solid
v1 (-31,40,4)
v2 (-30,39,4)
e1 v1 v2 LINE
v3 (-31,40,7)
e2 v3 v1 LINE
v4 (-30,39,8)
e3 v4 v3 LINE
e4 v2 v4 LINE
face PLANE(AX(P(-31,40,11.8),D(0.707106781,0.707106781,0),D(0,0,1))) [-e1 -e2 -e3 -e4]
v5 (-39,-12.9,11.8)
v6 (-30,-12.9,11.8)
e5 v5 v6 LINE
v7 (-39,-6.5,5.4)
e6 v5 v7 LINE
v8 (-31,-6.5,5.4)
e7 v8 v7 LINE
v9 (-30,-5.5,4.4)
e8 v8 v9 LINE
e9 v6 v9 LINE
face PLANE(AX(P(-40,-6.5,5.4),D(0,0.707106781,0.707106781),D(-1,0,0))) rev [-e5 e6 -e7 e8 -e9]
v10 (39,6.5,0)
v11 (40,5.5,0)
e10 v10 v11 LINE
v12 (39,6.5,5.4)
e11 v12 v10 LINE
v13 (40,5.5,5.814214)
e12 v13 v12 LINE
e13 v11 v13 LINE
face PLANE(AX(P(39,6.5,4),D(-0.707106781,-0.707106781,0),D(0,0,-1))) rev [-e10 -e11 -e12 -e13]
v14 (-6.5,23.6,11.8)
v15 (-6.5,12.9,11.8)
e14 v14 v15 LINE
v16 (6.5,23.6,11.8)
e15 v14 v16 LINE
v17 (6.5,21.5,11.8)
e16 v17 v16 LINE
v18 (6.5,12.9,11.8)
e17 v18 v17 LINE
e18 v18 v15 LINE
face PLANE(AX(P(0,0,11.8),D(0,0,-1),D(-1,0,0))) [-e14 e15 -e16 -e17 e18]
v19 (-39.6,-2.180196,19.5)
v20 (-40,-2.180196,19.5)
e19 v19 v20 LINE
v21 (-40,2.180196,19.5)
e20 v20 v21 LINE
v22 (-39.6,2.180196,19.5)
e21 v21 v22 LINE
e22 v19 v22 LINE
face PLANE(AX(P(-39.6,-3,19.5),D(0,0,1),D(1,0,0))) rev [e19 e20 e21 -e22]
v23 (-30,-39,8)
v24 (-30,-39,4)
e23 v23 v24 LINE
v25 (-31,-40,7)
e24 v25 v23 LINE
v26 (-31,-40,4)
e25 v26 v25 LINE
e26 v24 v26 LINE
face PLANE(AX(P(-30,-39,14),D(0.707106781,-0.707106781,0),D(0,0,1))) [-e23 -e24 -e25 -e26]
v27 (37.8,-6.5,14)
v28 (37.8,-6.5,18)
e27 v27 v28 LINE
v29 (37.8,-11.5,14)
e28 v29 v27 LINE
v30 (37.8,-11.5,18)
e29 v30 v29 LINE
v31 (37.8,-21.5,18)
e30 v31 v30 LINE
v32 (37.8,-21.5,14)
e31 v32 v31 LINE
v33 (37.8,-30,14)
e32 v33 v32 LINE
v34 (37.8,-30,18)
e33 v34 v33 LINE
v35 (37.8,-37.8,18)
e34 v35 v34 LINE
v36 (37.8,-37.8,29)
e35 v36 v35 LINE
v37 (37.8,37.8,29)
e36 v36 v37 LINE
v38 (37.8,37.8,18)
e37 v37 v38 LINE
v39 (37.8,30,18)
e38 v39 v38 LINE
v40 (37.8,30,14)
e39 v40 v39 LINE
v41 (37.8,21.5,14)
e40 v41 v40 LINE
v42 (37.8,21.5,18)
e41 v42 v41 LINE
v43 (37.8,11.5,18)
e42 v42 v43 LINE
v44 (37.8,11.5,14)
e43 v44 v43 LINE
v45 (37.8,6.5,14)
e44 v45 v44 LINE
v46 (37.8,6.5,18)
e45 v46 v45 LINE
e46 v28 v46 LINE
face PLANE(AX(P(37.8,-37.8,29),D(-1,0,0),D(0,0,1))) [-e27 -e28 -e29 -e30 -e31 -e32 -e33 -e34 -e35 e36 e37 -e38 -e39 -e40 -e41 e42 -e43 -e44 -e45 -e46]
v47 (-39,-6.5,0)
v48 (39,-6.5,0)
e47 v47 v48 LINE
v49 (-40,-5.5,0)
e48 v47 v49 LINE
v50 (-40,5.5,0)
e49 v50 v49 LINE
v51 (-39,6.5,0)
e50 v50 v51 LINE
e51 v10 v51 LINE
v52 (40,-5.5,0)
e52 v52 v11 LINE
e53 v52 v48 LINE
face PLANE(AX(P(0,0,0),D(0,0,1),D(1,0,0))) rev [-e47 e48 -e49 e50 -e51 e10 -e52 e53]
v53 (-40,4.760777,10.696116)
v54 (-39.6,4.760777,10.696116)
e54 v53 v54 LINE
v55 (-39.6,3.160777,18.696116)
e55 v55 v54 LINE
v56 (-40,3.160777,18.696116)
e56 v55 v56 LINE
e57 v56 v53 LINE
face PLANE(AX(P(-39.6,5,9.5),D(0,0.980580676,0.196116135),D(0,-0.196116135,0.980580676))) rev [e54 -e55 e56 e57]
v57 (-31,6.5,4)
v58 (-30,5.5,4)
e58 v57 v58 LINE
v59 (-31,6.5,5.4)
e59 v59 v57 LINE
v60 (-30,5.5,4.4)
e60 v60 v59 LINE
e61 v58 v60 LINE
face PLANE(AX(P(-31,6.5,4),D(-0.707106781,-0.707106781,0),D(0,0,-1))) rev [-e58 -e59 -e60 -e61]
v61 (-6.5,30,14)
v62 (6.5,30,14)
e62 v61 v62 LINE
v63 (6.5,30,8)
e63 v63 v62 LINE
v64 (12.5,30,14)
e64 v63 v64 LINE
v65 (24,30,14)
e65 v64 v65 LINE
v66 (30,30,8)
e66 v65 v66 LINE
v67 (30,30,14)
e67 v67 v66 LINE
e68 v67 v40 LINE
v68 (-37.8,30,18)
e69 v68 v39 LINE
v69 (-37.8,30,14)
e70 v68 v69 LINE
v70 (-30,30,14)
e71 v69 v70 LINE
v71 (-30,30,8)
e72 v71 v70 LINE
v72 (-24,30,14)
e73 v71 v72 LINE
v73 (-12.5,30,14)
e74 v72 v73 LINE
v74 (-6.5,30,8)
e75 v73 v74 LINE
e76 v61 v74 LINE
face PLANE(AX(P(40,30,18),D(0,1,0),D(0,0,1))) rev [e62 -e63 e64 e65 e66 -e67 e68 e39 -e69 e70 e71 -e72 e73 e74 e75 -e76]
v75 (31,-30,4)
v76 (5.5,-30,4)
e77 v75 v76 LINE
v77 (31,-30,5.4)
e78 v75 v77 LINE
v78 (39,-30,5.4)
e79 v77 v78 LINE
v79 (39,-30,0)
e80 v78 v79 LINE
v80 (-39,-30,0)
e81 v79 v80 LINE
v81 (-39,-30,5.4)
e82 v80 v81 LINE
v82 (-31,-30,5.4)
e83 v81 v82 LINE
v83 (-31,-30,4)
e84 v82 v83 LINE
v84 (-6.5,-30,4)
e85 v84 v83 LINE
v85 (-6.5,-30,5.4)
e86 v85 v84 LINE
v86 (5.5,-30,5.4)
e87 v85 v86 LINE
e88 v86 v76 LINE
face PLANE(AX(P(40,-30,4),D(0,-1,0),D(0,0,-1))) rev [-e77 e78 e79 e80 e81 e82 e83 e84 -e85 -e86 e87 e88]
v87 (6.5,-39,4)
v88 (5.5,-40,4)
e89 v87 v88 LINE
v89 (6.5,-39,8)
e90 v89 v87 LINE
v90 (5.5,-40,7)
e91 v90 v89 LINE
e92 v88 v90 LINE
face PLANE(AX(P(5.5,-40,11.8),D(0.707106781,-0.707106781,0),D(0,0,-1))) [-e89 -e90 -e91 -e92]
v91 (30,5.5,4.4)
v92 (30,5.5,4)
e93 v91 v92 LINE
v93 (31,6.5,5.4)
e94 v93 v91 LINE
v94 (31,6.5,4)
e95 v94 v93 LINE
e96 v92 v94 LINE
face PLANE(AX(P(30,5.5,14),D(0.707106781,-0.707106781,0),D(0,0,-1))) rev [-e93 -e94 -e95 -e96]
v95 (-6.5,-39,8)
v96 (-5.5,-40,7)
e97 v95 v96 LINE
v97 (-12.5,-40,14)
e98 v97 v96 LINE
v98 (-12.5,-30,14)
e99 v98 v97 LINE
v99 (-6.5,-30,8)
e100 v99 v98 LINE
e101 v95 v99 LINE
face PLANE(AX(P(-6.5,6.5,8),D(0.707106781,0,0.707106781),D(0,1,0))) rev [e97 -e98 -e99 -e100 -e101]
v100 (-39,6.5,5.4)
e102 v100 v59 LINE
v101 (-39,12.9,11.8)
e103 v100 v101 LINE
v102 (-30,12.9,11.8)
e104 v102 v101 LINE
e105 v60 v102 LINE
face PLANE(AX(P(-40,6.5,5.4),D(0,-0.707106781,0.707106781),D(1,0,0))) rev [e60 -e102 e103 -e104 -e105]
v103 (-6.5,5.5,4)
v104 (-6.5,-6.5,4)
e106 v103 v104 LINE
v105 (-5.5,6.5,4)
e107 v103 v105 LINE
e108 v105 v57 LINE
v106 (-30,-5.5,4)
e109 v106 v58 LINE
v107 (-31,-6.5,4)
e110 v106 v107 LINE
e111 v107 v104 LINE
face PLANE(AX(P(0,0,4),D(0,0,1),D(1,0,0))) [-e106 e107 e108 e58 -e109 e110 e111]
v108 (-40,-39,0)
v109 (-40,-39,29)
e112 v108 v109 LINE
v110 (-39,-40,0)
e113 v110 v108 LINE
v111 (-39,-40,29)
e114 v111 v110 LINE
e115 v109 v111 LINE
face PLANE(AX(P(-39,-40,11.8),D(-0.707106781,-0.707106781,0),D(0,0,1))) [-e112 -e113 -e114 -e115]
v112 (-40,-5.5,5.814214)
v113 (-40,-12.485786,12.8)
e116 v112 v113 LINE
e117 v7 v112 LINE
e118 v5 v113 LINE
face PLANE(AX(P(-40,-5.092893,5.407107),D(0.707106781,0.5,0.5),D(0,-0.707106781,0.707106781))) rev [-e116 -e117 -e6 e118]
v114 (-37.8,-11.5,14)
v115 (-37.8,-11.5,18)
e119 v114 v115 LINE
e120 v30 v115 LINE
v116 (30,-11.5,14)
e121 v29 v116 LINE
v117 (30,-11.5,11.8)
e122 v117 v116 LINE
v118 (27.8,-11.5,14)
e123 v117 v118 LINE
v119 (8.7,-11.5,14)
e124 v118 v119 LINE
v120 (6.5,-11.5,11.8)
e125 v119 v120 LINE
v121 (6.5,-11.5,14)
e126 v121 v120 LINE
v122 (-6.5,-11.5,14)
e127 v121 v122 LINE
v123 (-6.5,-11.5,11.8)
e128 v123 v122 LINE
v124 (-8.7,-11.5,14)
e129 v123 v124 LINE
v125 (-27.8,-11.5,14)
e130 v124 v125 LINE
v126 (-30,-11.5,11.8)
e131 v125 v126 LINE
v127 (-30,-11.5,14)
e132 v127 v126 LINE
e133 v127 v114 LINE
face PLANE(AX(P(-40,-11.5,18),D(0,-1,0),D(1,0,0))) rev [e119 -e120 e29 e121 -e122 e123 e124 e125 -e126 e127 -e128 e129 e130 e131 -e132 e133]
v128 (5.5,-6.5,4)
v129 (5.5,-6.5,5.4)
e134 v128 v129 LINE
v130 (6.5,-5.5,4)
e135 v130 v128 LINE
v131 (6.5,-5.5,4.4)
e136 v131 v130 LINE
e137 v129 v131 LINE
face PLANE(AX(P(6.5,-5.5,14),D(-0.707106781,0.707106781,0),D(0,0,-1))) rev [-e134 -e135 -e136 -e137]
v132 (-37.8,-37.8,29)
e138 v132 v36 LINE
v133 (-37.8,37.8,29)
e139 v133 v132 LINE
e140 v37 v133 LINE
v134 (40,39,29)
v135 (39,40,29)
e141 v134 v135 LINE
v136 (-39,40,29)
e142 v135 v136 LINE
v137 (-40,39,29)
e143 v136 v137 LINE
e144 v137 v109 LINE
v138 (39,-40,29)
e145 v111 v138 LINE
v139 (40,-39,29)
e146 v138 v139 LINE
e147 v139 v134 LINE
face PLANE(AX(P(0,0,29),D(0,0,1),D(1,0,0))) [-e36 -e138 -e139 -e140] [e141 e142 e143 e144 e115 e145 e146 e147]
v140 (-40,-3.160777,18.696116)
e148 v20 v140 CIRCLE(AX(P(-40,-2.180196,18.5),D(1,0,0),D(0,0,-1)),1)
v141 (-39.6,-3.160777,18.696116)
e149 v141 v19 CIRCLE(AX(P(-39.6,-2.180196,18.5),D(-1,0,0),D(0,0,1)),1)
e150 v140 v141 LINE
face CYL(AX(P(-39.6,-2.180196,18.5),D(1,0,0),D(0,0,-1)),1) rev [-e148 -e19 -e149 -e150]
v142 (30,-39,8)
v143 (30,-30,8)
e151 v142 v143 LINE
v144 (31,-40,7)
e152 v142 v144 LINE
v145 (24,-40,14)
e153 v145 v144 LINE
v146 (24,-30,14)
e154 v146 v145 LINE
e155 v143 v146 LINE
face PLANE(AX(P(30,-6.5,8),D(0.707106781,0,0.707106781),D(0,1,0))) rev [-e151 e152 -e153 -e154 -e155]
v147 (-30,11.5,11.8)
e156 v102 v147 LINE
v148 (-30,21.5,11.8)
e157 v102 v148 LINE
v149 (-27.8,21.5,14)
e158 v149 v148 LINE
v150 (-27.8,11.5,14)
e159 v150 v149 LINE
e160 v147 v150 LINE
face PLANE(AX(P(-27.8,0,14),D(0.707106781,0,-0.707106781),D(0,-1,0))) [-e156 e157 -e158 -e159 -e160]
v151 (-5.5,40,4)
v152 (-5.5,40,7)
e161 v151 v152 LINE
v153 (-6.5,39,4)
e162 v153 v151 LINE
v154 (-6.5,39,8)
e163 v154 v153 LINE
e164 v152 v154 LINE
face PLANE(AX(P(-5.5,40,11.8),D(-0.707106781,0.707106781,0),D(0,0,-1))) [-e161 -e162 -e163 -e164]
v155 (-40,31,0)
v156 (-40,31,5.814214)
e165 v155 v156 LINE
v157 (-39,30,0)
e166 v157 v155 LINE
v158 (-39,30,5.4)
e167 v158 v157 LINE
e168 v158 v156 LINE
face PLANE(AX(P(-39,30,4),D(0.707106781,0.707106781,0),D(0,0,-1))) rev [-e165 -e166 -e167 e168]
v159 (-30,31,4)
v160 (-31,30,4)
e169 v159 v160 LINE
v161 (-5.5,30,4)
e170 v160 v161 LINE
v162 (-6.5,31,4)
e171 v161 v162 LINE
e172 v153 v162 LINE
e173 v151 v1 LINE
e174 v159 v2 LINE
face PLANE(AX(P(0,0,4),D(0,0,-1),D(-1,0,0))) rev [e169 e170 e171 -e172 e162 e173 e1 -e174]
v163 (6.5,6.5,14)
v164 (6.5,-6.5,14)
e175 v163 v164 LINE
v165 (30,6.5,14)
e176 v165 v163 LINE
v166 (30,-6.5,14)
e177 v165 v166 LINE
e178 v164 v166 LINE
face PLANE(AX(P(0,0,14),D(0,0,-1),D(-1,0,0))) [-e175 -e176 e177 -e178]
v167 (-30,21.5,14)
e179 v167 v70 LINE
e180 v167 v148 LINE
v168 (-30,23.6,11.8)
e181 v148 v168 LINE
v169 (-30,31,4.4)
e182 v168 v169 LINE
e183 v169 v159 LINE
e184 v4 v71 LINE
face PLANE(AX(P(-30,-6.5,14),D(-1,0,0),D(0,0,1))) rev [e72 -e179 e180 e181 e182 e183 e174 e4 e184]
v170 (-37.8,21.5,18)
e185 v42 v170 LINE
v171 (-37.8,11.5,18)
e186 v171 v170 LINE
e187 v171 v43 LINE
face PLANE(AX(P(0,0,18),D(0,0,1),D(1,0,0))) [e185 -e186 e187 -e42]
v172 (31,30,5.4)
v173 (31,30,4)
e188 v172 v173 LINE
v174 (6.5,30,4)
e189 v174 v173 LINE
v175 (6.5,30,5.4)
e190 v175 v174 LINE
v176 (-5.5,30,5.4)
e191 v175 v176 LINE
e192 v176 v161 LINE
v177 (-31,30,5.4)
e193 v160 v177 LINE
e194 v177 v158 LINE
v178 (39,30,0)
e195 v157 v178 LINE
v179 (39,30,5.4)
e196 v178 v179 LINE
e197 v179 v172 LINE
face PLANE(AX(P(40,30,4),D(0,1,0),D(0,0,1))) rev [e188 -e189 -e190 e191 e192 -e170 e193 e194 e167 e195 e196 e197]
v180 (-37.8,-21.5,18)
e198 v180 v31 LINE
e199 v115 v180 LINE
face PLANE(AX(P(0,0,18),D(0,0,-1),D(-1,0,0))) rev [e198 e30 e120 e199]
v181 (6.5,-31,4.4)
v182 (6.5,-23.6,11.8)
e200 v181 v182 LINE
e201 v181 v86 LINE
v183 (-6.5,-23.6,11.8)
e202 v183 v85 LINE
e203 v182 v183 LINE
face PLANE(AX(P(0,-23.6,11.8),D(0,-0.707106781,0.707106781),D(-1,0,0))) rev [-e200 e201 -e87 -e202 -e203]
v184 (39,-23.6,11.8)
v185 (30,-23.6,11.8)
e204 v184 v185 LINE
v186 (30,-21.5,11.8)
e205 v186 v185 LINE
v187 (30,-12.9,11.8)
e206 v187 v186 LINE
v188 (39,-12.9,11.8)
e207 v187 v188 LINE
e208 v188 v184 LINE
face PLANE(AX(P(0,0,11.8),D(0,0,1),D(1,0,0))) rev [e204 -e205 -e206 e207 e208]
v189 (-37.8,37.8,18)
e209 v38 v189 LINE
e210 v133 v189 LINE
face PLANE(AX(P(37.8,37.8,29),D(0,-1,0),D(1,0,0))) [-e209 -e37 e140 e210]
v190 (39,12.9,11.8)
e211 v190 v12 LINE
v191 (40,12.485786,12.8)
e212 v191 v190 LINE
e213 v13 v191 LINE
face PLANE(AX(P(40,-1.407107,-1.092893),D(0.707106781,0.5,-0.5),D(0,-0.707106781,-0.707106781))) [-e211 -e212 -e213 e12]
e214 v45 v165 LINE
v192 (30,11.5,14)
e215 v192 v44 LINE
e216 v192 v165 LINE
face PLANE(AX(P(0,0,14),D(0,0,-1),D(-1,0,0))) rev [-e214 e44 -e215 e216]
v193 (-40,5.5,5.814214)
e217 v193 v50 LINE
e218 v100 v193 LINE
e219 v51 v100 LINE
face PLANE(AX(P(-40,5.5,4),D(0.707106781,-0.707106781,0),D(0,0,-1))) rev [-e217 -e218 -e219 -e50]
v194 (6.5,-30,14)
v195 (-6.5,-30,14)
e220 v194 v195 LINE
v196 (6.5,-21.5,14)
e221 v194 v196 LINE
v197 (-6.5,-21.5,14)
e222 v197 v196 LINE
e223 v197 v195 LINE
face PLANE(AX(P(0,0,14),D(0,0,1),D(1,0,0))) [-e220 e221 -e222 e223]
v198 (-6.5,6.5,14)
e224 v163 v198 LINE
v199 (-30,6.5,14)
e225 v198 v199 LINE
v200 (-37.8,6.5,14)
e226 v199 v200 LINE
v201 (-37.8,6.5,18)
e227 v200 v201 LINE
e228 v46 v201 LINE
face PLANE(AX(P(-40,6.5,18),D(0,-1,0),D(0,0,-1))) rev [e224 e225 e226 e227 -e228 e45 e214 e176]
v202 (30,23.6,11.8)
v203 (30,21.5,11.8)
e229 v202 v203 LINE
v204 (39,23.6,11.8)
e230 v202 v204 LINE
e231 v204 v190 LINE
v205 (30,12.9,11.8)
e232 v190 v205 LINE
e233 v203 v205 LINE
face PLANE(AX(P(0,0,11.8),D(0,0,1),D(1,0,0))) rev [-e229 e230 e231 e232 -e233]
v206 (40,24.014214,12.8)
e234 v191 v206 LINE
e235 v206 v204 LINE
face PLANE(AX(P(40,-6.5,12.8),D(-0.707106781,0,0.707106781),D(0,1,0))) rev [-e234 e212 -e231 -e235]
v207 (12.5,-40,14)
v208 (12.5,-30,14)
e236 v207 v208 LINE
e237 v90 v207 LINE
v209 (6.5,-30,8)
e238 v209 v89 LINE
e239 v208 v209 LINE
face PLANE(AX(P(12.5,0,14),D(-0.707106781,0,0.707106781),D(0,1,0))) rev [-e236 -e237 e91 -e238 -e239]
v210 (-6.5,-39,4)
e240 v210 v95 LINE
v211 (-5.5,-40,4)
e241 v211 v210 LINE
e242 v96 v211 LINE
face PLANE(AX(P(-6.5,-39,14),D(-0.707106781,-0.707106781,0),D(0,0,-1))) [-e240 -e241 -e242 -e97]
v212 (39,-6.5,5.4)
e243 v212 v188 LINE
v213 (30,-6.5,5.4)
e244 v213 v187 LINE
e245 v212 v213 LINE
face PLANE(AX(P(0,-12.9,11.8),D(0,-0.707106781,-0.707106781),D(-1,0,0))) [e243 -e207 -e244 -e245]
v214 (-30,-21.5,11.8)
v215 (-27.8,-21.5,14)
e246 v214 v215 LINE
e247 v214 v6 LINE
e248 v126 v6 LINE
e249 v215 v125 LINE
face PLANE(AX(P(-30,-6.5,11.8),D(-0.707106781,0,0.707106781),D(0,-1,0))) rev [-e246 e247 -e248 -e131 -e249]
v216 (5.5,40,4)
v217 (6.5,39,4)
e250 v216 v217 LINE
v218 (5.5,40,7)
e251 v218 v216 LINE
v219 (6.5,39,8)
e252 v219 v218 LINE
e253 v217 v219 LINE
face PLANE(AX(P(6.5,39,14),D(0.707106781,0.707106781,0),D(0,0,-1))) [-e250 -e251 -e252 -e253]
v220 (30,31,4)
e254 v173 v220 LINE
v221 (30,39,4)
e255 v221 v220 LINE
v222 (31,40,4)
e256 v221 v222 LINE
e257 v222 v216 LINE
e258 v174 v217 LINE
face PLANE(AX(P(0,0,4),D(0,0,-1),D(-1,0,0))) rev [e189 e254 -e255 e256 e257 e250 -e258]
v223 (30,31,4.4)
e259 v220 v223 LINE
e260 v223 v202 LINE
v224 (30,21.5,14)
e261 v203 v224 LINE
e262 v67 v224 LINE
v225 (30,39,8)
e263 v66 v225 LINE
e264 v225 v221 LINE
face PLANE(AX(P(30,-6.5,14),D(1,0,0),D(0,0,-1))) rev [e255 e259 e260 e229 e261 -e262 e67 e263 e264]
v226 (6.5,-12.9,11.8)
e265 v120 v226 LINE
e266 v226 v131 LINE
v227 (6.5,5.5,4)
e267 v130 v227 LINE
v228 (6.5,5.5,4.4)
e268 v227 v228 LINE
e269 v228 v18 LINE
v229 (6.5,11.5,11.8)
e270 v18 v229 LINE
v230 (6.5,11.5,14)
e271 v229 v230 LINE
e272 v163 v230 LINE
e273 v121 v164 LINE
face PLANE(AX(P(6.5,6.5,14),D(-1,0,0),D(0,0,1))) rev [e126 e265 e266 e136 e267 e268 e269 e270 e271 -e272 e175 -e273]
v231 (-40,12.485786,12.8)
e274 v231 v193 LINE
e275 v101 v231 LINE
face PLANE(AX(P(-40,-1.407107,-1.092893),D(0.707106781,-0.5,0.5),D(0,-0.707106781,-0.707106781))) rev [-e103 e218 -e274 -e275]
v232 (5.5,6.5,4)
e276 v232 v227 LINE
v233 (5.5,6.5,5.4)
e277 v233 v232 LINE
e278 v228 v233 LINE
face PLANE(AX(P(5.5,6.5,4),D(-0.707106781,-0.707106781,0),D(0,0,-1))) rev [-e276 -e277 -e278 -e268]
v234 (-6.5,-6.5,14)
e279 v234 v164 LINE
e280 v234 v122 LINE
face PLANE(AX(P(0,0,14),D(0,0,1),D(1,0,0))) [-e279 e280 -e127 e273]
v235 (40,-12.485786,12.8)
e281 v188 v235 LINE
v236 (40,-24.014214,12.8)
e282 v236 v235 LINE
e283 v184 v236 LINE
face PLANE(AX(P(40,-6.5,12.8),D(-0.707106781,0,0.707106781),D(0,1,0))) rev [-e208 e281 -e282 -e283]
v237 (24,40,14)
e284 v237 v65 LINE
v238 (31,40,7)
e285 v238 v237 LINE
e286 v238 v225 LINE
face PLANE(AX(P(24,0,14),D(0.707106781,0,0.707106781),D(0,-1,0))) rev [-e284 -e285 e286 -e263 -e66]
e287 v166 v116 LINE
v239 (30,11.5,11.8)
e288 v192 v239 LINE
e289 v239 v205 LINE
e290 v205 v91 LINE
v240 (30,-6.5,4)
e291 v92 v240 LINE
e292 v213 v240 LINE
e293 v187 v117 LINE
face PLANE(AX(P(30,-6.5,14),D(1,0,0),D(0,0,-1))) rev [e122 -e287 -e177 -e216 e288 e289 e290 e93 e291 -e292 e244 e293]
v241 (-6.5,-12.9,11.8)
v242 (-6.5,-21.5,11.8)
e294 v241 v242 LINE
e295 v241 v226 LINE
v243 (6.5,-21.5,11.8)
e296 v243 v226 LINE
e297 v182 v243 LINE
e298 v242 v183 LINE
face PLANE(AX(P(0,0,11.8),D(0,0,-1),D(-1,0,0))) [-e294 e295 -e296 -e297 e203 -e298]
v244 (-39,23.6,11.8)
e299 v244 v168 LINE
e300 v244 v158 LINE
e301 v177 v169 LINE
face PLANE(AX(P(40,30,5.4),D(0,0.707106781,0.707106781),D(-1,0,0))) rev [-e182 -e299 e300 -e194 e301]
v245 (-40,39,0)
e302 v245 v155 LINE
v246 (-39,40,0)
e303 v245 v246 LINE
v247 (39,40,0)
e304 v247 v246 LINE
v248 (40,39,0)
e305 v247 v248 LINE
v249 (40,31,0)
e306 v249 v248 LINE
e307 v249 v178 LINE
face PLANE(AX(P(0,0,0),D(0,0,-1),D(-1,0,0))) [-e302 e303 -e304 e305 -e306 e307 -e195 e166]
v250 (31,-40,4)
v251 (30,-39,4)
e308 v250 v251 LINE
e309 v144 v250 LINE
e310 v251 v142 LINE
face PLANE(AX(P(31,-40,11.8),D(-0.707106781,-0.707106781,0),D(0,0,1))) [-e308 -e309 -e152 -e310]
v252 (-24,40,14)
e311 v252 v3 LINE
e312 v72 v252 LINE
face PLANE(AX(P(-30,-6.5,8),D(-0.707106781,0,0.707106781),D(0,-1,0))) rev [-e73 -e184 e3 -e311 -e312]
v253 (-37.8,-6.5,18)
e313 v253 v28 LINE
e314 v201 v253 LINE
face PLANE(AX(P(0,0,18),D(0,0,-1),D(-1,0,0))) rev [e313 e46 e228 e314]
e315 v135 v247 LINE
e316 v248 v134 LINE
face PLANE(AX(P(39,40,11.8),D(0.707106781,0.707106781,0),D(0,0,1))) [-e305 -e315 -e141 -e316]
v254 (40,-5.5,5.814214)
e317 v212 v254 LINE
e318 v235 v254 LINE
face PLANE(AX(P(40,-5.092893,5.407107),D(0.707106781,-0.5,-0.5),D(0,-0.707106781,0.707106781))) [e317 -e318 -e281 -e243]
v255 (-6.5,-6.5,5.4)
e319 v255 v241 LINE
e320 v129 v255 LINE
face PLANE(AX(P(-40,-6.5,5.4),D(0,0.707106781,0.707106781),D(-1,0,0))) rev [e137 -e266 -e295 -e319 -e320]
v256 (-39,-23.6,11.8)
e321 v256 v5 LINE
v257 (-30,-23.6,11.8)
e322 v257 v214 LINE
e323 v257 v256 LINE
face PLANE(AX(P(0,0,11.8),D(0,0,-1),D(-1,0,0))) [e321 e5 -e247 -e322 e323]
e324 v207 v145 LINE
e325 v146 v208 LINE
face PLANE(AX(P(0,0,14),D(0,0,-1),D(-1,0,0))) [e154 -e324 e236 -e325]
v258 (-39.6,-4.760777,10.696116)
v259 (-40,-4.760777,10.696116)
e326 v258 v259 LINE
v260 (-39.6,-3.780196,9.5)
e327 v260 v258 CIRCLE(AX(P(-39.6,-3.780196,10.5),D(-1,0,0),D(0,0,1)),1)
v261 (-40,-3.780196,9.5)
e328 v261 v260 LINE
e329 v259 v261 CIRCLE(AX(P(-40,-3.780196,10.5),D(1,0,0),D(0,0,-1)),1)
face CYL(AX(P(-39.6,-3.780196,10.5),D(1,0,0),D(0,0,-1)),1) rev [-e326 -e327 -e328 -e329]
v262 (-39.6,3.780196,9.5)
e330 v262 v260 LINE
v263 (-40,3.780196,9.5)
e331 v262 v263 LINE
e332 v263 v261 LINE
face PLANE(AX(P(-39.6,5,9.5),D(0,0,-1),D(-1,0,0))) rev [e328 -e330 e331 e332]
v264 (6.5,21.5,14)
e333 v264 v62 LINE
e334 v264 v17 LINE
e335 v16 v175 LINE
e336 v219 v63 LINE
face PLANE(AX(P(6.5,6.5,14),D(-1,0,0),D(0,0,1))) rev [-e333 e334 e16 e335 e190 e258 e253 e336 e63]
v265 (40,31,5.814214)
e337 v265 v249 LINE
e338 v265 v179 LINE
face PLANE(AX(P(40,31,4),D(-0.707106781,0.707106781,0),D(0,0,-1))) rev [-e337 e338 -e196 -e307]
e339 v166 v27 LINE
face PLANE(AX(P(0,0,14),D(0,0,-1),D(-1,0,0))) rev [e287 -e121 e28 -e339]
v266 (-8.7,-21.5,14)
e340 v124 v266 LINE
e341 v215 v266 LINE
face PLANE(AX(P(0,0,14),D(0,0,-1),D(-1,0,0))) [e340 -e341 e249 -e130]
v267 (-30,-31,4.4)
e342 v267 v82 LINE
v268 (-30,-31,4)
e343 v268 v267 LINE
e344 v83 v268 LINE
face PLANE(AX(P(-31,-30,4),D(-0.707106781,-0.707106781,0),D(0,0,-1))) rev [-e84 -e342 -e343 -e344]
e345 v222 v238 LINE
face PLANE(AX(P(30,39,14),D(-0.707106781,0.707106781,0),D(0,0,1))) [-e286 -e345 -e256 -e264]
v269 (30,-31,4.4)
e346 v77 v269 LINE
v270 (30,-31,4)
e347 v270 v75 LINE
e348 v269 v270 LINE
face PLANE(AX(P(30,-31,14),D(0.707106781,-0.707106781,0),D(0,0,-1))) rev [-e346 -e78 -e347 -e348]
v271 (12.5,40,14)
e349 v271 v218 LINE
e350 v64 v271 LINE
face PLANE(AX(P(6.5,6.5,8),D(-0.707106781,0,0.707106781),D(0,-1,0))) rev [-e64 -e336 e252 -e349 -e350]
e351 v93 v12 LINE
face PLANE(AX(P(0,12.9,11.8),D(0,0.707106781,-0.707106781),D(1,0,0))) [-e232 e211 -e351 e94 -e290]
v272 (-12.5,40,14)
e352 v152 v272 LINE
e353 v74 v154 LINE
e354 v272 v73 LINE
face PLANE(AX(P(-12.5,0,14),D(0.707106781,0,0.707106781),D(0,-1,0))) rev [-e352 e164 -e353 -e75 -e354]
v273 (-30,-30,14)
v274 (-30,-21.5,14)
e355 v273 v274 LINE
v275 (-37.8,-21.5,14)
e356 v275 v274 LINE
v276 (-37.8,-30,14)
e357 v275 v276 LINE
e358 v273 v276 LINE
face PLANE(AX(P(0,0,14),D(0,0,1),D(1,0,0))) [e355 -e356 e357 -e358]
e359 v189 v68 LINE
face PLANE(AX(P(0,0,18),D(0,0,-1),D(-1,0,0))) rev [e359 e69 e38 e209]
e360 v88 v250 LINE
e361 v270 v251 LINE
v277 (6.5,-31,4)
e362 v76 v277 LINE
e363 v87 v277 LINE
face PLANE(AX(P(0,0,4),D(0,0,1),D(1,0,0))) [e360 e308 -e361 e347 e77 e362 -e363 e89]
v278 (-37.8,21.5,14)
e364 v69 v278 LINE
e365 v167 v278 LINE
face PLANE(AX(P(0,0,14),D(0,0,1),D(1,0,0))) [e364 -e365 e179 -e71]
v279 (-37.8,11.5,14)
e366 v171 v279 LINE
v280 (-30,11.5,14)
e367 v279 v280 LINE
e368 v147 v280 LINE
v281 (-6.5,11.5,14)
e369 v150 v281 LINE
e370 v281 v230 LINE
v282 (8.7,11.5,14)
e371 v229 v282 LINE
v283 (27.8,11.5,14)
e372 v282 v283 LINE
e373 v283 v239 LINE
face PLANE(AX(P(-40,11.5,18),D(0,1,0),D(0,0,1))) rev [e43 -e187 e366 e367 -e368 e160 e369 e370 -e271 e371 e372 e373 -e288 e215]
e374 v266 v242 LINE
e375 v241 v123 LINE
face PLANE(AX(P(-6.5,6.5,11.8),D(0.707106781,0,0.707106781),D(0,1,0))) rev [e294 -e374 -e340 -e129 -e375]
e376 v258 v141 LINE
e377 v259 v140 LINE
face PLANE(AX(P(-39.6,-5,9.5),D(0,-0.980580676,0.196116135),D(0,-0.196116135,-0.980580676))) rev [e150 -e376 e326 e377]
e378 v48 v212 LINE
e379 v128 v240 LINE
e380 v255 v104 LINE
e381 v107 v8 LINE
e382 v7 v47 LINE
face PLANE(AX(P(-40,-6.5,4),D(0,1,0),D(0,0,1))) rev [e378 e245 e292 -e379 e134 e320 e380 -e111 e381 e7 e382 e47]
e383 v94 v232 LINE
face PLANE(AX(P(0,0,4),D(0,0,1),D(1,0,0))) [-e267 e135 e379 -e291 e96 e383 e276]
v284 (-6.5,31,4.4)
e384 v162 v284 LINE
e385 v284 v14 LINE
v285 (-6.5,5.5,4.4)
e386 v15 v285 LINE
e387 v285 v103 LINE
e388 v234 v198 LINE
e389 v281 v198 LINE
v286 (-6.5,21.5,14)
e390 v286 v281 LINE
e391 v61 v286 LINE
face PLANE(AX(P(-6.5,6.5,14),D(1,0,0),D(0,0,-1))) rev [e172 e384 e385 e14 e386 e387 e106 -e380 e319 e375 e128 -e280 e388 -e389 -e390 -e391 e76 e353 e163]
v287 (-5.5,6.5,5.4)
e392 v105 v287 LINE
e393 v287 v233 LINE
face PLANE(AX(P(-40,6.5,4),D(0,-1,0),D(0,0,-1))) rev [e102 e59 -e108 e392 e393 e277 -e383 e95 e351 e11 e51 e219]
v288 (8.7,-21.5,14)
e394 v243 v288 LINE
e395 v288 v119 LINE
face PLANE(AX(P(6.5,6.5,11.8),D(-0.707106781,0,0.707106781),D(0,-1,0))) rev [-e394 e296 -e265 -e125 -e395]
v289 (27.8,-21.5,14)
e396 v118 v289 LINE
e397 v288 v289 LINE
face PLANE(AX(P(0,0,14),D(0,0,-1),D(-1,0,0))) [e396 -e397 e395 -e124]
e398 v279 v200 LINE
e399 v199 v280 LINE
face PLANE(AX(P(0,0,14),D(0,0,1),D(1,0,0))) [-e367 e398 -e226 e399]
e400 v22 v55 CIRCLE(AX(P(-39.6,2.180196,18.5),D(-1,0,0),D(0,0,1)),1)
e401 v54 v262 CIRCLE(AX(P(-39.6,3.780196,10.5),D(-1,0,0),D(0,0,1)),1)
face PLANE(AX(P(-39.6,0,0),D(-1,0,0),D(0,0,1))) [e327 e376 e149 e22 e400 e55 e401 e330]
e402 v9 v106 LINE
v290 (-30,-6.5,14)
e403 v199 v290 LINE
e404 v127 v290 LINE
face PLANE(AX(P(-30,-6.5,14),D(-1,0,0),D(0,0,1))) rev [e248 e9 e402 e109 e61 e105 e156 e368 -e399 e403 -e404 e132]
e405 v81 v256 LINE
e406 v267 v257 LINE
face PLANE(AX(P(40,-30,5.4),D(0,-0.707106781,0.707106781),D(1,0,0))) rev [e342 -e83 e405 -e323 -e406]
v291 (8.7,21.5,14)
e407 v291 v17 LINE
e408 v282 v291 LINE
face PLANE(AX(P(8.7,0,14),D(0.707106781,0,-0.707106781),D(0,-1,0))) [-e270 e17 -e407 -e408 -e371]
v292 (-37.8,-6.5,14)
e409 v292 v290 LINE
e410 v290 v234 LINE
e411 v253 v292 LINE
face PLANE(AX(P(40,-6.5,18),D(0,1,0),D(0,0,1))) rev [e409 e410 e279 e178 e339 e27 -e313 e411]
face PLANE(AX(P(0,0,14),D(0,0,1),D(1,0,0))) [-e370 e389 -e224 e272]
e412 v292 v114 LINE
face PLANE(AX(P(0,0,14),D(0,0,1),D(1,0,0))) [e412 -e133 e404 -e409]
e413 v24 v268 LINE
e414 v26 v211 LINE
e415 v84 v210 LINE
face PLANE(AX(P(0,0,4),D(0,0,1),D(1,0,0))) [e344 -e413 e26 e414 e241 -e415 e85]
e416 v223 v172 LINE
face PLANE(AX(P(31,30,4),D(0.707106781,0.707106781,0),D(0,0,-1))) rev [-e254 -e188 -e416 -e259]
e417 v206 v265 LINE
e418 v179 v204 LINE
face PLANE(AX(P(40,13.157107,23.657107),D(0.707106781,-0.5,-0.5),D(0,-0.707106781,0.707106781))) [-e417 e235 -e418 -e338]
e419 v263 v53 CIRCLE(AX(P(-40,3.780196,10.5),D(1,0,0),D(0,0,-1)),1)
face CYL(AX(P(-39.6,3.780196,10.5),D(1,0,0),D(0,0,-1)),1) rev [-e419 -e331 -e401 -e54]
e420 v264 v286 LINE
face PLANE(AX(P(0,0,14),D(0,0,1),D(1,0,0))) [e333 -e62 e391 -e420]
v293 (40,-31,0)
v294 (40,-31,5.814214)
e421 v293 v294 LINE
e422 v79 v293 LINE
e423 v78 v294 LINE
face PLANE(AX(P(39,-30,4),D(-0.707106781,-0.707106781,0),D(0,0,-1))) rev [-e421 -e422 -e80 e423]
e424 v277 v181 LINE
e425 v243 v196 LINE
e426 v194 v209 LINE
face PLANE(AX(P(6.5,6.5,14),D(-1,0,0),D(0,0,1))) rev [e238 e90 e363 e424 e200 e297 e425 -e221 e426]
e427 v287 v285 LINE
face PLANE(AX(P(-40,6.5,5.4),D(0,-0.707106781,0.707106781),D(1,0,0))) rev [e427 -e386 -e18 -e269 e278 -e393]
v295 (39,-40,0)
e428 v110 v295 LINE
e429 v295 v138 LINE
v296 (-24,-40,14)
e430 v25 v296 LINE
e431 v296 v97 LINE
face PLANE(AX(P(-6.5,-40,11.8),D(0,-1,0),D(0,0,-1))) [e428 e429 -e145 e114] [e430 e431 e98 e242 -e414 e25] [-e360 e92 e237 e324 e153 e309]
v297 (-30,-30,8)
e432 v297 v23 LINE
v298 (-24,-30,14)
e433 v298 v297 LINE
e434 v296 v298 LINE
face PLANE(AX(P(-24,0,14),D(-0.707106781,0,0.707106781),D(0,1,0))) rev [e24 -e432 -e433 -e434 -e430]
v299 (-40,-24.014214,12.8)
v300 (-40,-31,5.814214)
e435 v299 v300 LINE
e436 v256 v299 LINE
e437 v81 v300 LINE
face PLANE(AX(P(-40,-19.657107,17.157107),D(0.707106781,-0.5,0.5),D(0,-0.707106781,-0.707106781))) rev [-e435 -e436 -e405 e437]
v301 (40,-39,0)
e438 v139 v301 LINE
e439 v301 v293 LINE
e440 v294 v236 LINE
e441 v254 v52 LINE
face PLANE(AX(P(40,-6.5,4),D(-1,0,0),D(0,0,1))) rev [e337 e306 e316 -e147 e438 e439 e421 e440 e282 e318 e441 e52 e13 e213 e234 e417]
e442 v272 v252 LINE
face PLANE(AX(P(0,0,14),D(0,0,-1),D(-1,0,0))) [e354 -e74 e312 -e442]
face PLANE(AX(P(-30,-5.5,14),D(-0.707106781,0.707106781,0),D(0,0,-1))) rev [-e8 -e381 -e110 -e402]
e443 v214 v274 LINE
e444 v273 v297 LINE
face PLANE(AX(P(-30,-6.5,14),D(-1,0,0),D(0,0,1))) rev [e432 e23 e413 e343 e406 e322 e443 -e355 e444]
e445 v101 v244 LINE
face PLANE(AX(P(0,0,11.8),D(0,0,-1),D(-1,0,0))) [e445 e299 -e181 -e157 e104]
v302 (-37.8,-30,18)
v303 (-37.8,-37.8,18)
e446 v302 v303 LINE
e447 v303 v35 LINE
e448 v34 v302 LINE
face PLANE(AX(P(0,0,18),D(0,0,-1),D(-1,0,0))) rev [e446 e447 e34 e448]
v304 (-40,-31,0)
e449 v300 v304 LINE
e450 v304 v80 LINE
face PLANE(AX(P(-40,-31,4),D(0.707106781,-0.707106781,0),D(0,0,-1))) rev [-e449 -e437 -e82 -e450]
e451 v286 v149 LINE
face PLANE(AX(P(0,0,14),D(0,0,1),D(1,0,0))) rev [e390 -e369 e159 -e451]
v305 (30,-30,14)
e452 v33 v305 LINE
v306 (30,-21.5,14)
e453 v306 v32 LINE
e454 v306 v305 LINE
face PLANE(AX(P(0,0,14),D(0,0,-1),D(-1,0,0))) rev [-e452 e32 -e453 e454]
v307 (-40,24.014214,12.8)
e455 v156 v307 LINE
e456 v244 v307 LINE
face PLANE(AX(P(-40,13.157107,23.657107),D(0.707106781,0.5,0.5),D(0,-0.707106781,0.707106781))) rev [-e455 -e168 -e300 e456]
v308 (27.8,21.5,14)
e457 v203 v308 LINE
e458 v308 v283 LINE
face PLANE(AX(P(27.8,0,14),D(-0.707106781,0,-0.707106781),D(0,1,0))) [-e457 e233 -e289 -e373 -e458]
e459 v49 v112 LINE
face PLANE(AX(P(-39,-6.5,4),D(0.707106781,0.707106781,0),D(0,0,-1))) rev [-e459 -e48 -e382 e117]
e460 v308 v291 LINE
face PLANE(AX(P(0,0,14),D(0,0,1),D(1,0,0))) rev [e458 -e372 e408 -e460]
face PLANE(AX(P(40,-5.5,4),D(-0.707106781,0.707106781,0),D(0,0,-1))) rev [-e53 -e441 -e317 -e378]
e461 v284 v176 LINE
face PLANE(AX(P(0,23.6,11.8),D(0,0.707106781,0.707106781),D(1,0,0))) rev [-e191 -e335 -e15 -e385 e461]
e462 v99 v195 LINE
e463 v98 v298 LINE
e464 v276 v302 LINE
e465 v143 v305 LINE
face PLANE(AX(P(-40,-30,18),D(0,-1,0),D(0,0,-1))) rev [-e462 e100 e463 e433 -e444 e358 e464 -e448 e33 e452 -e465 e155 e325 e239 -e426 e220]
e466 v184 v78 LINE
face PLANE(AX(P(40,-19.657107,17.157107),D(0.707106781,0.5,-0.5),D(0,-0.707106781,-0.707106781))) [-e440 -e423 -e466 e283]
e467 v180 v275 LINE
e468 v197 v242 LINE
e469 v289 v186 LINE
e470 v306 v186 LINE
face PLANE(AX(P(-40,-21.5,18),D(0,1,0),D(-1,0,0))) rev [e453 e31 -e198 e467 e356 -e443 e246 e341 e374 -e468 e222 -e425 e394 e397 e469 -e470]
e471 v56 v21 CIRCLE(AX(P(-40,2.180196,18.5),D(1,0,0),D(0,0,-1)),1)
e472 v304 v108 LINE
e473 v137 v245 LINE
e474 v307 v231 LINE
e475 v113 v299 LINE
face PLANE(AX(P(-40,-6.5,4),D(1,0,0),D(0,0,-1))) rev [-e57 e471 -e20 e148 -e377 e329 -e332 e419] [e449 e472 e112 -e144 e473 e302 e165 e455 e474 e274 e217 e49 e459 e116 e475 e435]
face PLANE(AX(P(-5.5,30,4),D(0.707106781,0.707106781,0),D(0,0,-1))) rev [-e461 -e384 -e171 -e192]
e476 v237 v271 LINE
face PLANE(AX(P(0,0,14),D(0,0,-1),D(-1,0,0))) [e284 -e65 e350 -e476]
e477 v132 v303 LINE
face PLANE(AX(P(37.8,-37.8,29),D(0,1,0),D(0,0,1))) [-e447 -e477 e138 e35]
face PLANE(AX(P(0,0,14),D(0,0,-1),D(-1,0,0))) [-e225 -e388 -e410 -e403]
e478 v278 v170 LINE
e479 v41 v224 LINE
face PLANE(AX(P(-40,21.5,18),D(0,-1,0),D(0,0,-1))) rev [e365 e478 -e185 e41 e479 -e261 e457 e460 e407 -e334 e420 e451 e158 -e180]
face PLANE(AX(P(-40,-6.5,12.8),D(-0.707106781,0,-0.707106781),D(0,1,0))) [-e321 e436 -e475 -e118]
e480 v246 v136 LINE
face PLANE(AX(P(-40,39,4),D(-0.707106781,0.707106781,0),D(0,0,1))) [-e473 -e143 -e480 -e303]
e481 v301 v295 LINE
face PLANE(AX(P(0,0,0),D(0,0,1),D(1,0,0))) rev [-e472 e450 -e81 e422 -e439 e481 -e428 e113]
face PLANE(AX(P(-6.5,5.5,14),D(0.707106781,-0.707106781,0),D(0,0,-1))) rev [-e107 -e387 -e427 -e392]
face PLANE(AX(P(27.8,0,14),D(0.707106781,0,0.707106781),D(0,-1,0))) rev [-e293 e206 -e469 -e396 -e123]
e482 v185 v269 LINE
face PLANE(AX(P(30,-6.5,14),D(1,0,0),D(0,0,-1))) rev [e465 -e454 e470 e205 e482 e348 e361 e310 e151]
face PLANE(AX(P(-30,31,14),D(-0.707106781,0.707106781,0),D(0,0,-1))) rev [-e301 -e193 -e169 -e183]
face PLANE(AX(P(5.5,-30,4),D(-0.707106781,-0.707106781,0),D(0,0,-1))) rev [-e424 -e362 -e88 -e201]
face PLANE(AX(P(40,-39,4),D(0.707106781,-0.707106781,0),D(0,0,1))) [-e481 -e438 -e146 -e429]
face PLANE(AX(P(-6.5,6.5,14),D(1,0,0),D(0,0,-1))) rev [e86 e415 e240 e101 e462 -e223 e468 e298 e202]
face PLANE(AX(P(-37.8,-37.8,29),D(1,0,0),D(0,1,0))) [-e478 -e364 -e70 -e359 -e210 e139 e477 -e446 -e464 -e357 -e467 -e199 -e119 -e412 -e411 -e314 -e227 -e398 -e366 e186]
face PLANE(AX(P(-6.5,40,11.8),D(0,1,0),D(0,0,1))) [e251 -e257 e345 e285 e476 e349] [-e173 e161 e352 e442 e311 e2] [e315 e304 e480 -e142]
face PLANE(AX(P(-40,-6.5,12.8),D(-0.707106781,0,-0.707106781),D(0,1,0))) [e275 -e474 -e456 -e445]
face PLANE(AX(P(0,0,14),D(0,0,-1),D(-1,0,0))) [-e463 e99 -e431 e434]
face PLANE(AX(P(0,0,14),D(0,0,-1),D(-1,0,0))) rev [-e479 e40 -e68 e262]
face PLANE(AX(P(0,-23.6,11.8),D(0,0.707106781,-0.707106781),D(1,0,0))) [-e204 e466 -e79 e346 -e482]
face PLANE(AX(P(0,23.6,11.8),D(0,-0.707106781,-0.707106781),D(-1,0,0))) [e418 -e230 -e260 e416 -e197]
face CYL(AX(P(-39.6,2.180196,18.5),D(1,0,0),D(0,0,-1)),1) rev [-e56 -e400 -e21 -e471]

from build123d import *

# Parameters (mm, degrees)
CROQUIS1_W                = 13
CROQUIS1_H                = 80
SALIENTE_EXTRUIR1_DEPTH   = 4
CROQUIS1_W_2              = 10
SALIENTE_EXTRUIR1_2_DEPTH = 4
SALIENTE_EXTRUIR1_3_DEPTH = 4
CROQUIS2_W                = 13
CROQUIS2_H                = 13
CROQUIS2_W_2              = 10
CROQUIS2_H_2              = 10
SALIENTE_EXTRUIR2_DEPTH   = 10
CROQUIS3_W                = 13
CROQUIS3_H                = 80
CROQUIS3_W_2              = 10
SALIENTE_EXTRUIR3_DEPTH   = 2.2
CROQUIS4_W                = 80
CROQUIS4_H                = 10
CROQUIS4_H_2              = 13
SALIENTE_EXTRUIR4_DEPTH   = 4
CROQUIS5_W                = 80
CROQUIS5_H                = 80
CROQUIS5_W_2              = 75.6
CROQUIS5_H_2              = 75.6
SALIENTE_EXTRUIR5_DEPTH   = 15
CHAFL_N2_SIZE             = 6.4
CHAFL_N3_SIZE             = 6
CHAFL_N4_SIZE             = 2.2
CORTAR_EXTRUIR1_DEPTH     = 0.4
REDONDEO1_R               = 1
CHAFL_N1_SIZE             = 1


with BuildPart() as part:
    # Croquis1 → Saliente-Extruir1 (new body)
    with BuildSketch(Plane(origin=(0, 0, 0), x_dir=(0, 1, 0), z_dir=(0, 0, 1))):
        Rectangle(CROQUIS1_W, CROQUIS1_H)
    extrude(amount=SALIENTE_EXTRUIR1_DEPTH)



with BuildPart() as body_2:
    # Croquis1 → Saliente-Extruir1 2 (new body)
    with BuildSketch(Plane(origin=(0, 0, 0), x_dir=(0, 1, 0), z_dir=(0, 0, 1))):
        with Locations((35, 0)):
            Rectangle(CROQUIS1_W_2, CROQUIS1_H)
    extrude(amount=SALIENTE_EXTRUIR1_2_DEPTH)


with BuildPart() as body_3:
    # Croquis1 → Saliente-Extruir1 3 (new body)
    with BuildSketch(Plane(origin=(0, 0, 0), x_dir=(0, 1, 0), z_dir=(0, 0, 1))):
        with Locations((-35, 0)):
            Rectangle(CROQUIS1_W_2, CROQUIS1_H)
    extrude(amount=SALIENTE_EXTRUIR1_3_DEPTH)


with BuildPart() as part_1:
    add(part.part)

    add(body_2.part)  # Saliente-Extruir2 merges body 2

    add(body_3.part)  # Saliente-Extruir2 merges body 3
    # Croquis2 → Saliente-Extruir2 (add)
    with BuildSketch(Plane.XY.offset(4)):
        Rectangle(CROQUIS2_W, CROQUIS2_H)
        with Locations((-35, 0)):
            Rectangle(CROQUIS2_W_2, CROQUIS2_H)
        with Locations((35, 0)):
            Rectangle(CROQUIS2_W_2, CROQUIS2_H)
        with Locations((0, 35)):
            Rectangle(CROQUIS2_W, CROQUIS2_H_2)
        with Locations((-35, 35)):
            Rectangle(CROQUIS2_W_2, CROQUIS2_H_2)
        with Locations((35, 35)):
            Rectangle(CROQUIS2_W_2, CROQUIS2_H_2)
        with Locations((35, -35)):
            Rectangle(CROQUIS2_W_2, CROQUIS2_H_2)
        with Locations((-35, -35)):
            Rectangle(CROQUIS2_W_2, CROQUIS2_H_2)
        with Locations((0, -35)):
            Rectangle(CROQUIS2_W, CROQUIS2_H_2)
    extrude(amount=SALIENTE_EXTRUIR2_DEPTH)

    # Croquis3 → Saliente-Extruir3 (add)
    with BuildSketch(Plane.XY.offset(14)):
        Rectangle(CROQUIS3_W, CROQUIS3_H)
        with Locations((-35, 0)):
            Rectangle(CROQUIS3_W_2, CROQUIS3_H)
        with Locations((35, 0)):
            Rectangle(CROQUIS3_W_2, CROQUIS3_H)
    extrude(amount=-SALIENTE_EXTRUIR3_DEPTH)

    # Croquis4 → Saliente-Extruir4 (add)
    with BuildSketch(Plane.XY.offset(14)):
        with Locations((0, -35)):
            Rectangle(CROQUIS4_W, CROQUIS4_H)
        Rectangle(CROQUIS4_W, CROQUIS4_H_2)
        with Locations((0, 35)):
            Rectangle(CROQUIS4_W, CROQUIS4_H)
        with Locations((0, 16.5)):
            Rectangle(CROQUIS4_W, CROQUIS4_H)
        with Locations((0, -16.5)):
            Rectangle(CROQUIS4_W, CROQUIS4_H)
    extrude(amount=SALIENTE_EXTRUIR4_DEPTH)

    # Croquis5 → Saliente-Extruir5 (add)
    with BuildSketch(Plane.XY.offset(14)):
        Rectangle(CROQUIS5_W, CROQUIS5_H)
        Rectangle(CROQUIS5_W_2, CROQUIS5_H_2, mode=Mode.SUBTRACT)
    extrude(amount=SALIENTE_EXTRUIR5_DEPTH)

    # Chaflán2
    chafl_n2_edges = [part_1.edges().sort_by_distance(p)[0] for p in [
        (0, -30, 11.8),
        (-35, 6.5, 11.8),
        (-35, -6.5, 11.8),
        (-35, 30, 11.8),
        (-35, -30, 11.8),
        (35, 6.5, 11.8),
        (35, 30, 11.8),
        (35, -6.5, 11.8),
        (35, -30, 11.8),
        (0, 6.5, 11.8),
        (0, -6.5, 11.8),
        (0, 30, 11.8),
    ]]
    chamfer(chafl_n2_edges, length=CHAFL_N2_SIZE)

    # Chaflán3
    chafl_n3_edges = [part_1.edges().sort_by_distance(p)[0] for p in [
        (-6.5, -35, 14),
        (30, -35, 14),
        (6.5, 35, 14),
        (-30, 35, 14),
        (6.5, -35, 14),
        (-6.5, 35, 14),
        (-30, -35, 14),
        (30, 35, 14),
    ]]
    chamfer(chafl_n3_edges, length=CHAFL_N3_SIZE)

    # Chaflán4
    chafl_n4_edges = [part_1.edges().sort_by_distance(p)[0] for p in [
        (30, 16.5, 14),
        (30, -16.5, 14),
        (6.5, -16.5, 14),
        (-6.5, -16.5, 14),
        (-30, -16.5, 14),
        (6.5, 16.5, 14),
        (-30, 16.5, 14),
    ]]
    chamfer(chafl_n4_edges, length=CHAFL_N4_SIZE - 0.0001)  # a hair under: the kernel refuses the full size

    # Croquis6 → Cortar-Extruir1 (cut)
    with BuildSketch(Plane(origin=(-40, 0, 0), x_dir=(0, -1, 0), z_dir=(-1, 0, 0))):
        Polygon((-5, 9.5), (5, 9.5), (3, 19.5), (-3, 19.5), align=None)
    extrude(amount=-CORTAR_EXTRUIR1_DEPTH, mode=Mode.SUBTRACT)

    # Redondeo1
    redondeo1_edges = [part_1.edges().sort_by_distance(p)[0] for p in [
        (-39.8, -3, 19.5),
        (-39.8, -5, 9.5),
        (-39.8, 5, 9.5),
        (-39.8, 3, 19.5),
    ]]
    fillet(redondeo1_edges, radius=REDONDEO1_R)

    # Chaflán1
    chafl_n1_edges = [part_1.edges().sort_by_distance(p)[0] for p in [
        (-40, 40, 14.5),
        (-40, -40, 14.5),
        (40, -40, 14.5),
        (40, 6.5, 2.7),
        (-40, 6.5, 2.7),
        (-30, 6.5, 4.7),
        (-6.5, 6.5, 4.7),
        (6.5, 6.5, 4.7),
        (30, 6.5, 4.7),
        (6.5, -6.5, 4.7),
        (-30, -6.5, 4.7),
        (-40, -6.5, 2.7),
        (40, -6.5, 2.7),
        (-40, -18.25, 11.8),
        (30, 30, 4.7),
        (-6.5, 30, 4.7),
        (-30, 30, 4.7),
        (-40, 30, 2.7),
        (40, 30, 2.7),
        (-40, 18.25, 11.8),
        (40, -30, 2.7),
        (-40, -30, 2.7),
        (-30, -30, 4.7),
        (6.5, -30, 4.7),
        (30, -30, 4.7),
        (40, 18.25, 11.8),
        (40, -18.25, 11.8),
        (-40, -9.7, 8.6),
        (-40, 26.8, 8.6),
        (-40, 9.7, 8.6),
        (-40, -26.8, 8.6),
        (40, 9.7, 8.6),
        (40, 26.8, 8.6),
        (40, -9.7, 8.6),
        (40, -26.8, 8.6),
        (30, 40, 6),
        (30, -40, 6),
        (-30, 40, 6),
        (-30, -40, 6),
        (6.5, 40, 6),
        (-6.5, -40, 6),
        (6.5, -40, 6),
        (-6.5, 40, 6),
        (40, 40, 14.5),
    ]]
    chamfer(chafl_n1_edges, length=CHAFL_N1_SIZE)


solid = part_1.part
